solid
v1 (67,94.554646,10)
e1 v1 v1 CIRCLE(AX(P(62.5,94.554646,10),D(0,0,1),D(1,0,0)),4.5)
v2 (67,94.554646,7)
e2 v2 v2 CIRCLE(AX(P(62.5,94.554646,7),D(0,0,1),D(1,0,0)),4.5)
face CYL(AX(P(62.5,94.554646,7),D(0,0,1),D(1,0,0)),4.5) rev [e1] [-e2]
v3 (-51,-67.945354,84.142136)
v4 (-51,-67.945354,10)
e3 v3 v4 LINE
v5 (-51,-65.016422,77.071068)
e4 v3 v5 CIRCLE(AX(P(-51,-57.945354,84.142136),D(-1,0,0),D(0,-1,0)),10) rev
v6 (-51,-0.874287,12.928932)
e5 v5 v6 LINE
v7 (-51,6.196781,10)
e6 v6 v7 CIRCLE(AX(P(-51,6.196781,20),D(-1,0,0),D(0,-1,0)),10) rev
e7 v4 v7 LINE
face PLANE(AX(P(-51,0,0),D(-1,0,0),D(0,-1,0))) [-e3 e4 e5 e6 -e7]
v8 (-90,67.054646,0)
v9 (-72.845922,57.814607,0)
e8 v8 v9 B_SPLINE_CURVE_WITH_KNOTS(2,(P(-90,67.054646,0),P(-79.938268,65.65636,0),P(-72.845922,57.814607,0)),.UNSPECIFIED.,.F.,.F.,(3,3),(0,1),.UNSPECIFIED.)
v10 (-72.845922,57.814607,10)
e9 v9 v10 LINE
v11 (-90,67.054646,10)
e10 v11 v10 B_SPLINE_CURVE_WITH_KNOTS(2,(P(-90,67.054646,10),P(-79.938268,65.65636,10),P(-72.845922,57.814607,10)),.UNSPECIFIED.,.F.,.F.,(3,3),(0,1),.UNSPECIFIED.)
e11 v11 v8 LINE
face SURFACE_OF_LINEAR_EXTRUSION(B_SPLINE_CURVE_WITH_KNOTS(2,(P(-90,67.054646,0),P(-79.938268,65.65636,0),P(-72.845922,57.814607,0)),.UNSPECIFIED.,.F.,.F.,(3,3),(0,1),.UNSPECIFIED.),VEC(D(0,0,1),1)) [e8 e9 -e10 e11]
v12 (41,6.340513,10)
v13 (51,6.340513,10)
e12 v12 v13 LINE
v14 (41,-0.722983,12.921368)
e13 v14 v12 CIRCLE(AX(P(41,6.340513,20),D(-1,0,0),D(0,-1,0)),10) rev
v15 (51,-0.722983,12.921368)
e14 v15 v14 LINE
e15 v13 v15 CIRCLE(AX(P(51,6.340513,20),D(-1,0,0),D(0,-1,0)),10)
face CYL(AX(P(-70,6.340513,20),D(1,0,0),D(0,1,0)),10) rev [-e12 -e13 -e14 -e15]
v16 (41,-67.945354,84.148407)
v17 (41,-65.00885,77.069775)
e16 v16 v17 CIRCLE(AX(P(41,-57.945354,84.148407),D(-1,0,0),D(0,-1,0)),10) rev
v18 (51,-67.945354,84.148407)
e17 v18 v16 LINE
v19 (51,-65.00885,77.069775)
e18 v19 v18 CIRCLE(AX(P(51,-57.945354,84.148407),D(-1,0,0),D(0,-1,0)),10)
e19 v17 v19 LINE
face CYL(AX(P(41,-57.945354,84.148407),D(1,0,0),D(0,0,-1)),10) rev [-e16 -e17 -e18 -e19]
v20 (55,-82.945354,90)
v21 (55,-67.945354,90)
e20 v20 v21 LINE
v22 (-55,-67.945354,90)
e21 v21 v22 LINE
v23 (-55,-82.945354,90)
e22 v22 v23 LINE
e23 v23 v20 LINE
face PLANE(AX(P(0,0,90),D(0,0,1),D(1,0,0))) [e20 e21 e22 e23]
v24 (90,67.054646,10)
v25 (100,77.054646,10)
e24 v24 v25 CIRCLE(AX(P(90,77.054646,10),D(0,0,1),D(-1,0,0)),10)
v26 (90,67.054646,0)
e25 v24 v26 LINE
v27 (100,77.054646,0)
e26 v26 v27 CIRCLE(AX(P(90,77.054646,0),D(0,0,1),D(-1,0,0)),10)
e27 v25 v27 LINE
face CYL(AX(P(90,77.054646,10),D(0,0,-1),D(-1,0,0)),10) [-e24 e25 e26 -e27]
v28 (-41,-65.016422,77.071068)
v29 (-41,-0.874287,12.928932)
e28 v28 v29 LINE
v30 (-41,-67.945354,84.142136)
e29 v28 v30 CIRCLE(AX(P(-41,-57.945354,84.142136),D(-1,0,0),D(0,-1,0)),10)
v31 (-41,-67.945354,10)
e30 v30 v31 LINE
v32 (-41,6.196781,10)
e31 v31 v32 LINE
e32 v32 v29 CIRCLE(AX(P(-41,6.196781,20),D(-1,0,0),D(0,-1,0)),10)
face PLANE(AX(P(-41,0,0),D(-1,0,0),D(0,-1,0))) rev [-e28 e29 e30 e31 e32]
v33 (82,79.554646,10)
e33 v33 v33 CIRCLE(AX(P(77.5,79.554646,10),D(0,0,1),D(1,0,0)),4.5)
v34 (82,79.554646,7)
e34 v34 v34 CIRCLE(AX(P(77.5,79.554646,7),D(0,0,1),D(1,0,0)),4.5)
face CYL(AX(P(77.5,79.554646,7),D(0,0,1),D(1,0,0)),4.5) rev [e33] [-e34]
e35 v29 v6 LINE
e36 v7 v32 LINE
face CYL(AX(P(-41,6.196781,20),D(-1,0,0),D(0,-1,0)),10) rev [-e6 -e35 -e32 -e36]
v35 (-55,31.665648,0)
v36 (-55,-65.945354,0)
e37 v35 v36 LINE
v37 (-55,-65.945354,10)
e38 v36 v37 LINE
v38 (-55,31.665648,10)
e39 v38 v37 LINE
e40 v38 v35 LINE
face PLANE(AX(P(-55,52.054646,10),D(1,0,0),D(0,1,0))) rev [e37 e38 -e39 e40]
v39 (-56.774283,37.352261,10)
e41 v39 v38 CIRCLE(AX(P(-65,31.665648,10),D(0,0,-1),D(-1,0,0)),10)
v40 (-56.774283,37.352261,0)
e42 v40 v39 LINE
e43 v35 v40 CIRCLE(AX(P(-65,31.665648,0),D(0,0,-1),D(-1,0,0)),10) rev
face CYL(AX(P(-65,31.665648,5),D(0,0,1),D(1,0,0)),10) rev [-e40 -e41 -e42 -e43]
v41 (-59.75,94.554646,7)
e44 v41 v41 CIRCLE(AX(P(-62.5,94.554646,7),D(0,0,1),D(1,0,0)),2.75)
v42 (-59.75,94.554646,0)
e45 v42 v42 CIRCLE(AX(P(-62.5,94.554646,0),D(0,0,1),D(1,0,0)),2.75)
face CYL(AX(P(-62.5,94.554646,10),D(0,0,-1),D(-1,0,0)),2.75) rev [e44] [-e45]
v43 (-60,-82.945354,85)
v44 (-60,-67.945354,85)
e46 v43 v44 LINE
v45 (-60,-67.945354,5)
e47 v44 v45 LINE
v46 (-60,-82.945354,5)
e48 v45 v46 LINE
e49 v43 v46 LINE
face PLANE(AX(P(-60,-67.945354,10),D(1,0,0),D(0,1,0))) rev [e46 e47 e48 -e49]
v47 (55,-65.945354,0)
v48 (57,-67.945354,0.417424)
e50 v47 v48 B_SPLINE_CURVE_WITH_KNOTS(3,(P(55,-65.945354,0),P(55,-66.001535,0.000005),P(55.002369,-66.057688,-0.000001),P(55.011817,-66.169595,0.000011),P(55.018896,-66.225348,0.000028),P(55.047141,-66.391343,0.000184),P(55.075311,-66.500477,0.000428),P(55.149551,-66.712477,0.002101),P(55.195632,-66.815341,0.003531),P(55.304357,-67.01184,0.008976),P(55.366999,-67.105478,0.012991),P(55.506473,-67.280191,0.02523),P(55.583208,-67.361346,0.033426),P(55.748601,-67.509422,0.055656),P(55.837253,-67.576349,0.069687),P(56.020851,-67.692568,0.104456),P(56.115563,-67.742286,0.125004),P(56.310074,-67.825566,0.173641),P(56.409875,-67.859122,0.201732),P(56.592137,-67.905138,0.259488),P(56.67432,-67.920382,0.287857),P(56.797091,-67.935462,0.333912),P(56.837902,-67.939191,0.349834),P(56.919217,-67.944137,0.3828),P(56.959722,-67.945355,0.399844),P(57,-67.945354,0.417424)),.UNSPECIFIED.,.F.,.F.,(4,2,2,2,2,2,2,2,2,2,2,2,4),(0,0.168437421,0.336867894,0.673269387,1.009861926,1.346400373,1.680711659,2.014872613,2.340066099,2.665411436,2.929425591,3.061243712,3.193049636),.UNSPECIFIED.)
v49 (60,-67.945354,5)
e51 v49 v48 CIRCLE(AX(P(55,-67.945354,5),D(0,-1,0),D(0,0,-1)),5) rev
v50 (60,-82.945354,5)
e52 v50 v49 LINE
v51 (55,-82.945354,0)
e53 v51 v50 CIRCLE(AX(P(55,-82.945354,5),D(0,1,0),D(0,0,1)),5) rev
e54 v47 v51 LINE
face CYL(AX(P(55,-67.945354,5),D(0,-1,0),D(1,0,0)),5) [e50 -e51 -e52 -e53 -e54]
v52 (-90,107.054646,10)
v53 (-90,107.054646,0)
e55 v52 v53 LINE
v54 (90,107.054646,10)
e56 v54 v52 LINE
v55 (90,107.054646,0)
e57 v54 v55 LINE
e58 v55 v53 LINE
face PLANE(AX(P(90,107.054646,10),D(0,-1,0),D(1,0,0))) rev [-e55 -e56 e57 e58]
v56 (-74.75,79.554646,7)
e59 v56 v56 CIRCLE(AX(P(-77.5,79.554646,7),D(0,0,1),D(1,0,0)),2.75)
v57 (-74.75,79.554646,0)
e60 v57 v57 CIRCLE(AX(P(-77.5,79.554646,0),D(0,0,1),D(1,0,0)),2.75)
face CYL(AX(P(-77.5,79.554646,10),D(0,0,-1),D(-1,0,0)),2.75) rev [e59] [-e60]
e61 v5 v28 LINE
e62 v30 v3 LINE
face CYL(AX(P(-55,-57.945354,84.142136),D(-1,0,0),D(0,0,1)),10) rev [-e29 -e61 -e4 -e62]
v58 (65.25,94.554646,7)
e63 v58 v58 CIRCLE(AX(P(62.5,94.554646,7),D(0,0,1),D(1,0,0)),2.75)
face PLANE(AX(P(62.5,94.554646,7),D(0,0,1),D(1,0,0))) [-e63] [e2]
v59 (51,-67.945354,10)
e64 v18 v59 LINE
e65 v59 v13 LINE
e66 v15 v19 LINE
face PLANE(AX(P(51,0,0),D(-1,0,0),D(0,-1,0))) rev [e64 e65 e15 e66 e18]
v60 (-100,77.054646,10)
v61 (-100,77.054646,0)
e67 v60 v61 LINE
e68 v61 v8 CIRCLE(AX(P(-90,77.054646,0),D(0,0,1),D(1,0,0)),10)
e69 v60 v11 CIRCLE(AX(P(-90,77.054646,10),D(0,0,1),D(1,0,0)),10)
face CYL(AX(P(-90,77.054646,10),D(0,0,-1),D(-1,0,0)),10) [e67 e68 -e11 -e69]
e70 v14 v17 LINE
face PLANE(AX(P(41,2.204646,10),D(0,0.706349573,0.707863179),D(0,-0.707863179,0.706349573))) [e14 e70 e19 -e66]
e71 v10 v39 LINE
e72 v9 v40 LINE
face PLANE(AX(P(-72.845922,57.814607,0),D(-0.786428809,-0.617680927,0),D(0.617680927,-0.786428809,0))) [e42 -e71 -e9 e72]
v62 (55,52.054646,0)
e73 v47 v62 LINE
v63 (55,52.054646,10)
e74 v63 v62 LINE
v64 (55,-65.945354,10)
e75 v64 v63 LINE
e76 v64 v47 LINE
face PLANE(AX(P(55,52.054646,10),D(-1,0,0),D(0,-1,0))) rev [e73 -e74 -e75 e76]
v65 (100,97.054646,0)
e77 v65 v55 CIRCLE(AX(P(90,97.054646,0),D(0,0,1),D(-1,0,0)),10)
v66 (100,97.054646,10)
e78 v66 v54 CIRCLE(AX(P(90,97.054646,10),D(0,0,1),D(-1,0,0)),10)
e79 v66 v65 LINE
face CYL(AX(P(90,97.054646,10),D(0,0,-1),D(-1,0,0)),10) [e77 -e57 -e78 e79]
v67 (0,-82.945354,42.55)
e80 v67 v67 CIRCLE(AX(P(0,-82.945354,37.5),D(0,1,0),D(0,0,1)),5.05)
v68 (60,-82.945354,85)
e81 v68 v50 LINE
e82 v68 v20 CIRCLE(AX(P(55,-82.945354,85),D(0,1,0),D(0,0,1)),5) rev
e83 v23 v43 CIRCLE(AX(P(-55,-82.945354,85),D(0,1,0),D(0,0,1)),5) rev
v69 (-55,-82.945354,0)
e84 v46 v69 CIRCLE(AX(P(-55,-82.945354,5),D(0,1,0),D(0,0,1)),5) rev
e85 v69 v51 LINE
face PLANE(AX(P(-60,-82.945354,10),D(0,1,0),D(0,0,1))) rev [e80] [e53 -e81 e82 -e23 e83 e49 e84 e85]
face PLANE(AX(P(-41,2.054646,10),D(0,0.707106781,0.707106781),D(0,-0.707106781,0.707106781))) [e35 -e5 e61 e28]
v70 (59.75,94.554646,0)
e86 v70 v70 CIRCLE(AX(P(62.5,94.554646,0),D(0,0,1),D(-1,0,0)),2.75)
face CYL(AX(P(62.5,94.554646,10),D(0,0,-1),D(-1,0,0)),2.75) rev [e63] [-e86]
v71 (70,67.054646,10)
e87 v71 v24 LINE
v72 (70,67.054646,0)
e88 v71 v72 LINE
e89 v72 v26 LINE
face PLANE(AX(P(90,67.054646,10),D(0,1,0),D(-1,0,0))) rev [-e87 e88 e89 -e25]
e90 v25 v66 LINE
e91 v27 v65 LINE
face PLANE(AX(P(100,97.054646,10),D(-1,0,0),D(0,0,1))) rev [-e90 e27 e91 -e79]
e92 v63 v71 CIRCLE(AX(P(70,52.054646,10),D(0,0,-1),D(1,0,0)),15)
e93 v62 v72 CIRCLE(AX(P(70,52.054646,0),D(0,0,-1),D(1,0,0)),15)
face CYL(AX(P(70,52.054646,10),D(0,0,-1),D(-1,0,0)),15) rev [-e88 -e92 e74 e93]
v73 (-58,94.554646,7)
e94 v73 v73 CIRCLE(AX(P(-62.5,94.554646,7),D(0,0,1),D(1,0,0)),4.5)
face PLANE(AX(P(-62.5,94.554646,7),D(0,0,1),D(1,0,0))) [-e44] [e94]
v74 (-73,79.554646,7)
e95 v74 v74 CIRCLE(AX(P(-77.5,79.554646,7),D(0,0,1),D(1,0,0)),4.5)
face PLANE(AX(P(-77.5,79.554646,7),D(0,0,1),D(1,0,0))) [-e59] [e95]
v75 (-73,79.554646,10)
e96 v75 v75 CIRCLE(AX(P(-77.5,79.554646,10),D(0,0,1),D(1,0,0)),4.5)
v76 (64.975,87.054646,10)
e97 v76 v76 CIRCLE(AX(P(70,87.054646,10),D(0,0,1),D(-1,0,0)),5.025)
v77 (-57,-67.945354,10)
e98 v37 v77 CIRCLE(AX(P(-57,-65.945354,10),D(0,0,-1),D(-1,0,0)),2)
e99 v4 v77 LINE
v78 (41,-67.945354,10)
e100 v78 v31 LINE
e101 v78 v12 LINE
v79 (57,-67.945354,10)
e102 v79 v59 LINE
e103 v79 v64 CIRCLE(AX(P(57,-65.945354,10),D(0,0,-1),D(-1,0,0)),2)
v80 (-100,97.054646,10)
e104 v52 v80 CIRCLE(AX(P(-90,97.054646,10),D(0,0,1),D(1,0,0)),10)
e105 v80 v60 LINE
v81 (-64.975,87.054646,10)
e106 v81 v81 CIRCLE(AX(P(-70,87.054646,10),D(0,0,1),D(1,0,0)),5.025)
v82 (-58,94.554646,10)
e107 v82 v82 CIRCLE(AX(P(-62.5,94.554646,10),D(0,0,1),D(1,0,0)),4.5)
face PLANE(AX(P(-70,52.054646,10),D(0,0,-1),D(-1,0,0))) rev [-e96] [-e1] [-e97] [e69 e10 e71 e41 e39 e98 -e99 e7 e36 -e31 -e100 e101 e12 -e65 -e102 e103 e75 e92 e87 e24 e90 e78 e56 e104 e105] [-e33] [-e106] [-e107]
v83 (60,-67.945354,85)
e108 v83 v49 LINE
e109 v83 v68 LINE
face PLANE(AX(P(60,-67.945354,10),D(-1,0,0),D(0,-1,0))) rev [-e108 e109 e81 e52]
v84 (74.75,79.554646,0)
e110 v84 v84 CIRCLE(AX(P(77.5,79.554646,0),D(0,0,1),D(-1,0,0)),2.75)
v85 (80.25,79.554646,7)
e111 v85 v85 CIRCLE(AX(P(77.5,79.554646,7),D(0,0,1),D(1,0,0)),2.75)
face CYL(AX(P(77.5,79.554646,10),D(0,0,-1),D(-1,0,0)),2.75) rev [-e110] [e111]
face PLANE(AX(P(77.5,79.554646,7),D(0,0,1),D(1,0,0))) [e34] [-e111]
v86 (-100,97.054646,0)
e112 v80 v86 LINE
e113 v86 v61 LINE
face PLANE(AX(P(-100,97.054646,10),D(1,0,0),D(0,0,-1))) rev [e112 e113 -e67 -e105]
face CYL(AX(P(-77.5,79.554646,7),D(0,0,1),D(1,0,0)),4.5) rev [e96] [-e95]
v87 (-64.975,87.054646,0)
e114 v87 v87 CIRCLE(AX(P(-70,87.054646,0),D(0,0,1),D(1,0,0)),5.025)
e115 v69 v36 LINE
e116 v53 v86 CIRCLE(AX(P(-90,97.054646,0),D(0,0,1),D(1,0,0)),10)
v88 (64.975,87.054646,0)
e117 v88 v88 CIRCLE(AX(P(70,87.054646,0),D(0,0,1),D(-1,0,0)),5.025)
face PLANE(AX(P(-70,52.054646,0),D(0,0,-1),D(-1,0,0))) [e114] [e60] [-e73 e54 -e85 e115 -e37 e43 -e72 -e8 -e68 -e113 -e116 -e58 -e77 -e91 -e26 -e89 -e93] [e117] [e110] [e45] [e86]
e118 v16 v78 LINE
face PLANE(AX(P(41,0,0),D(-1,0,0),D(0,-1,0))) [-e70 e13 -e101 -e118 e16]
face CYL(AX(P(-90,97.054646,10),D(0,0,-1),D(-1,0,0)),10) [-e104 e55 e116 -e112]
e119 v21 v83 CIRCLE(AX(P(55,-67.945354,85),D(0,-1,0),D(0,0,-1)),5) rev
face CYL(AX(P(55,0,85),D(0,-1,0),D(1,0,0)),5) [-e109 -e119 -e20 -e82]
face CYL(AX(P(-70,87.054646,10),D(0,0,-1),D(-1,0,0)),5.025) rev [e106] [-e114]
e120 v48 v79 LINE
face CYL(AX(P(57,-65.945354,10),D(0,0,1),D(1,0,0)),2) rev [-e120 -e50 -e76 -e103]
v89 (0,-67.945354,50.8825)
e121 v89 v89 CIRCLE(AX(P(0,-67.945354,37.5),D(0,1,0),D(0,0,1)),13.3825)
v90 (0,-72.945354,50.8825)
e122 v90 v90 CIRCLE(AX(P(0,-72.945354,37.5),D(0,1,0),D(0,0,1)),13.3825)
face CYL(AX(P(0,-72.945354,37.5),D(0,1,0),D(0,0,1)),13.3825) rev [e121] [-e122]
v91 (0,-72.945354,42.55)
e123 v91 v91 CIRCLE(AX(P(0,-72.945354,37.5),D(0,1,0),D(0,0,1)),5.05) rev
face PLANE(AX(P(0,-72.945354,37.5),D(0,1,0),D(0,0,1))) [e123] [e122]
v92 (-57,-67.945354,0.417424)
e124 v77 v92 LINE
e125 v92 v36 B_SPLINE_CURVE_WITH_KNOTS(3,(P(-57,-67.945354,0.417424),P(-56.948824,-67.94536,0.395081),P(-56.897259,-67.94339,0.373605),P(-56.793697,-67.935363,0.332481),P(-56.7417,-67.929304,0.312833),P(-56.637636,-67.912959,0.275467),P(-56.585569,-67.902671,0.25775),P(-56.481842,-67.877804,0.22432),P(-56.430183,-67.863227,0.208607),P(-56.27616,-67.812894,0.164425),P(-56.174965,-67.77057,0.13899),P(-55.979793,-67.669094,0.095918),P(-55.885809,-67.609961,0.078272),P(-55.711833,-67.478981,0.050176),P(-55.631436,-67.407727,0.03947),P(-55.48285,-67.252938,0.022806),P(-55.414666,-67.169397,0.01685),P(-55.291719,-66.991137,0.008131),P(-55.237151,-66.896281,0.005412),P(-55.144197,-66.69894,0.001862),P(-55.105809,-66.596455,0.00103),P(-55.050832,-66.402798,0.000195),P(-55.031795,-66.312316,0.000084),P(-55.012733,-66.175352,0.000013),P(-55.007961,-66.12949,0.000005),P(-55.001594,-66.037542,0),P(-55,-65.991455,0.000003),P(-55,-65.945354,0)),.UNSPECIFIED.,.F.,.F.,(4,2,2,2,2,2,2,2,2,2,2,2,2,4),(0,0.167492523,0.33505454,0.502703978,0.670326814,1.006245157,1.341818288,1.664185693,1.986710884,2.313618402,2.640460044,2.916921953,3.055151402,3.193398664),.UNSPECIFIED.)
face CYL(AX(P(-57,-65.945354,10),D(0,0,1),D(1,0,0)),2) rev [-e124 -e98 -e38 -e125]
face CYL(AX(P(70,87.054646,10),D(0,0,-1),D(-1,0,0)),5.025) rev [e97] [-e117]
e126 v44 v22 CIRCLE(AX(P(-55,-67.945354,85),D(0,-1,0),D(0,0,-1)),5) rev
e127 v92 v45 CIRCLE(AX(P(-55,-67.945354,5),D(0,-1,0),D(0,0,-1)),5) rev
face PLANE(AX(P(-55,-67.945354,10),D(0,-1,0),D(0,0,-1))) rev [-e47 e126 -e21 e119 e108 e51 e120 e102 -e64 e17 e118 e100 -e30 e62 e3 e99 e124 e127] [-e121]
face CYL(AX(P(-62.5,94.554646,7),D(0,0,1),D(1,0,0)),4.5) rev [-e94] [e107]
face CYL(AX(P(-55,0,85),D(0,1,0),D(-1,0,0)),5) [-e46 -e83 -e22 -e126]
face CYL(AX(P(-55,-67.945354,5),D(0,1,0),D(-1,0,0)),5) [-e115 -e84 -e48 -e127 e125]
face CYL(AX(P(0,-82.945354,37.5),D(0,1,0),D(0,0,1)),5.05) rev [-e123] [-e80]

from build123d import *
from OCP.BRepAlgoAPI import BRepAlgoAPI_Cut
from OCP.TopTools import TopTools_ListOfShape

# Parameters (mm, degrees)
SKIZZE1_R                       = 5.025
SKIZZE1_R_2                     = 2.75
AUFSATZ_LINEAR_AUSTRAGEN1_DEPTH = 10
AUFSATZ_LINEAR_AUSTRAGEN3_DEPTH = 10
SKIZZE4_W                       = 120
SKIZZE4_H                       = 15
AUFSATZ_LINEAR_AUSTRAGEN4_DEPTH = 80
AUFSATZ_LINEAR_AUSTRAGEN5_DEPTH = 10
AUFSATZ_LINEAR_AUSTRAGEN6_DEPTH = 10
VERRUNDUNG3_R                   = 10
VERRUNDUNG4_R                   = 5
VERRUNDUNG5_R                   = 10
SKIZZE11_R                      = 4.5
SCHNITT_LINEAR_AUSTRAGEN1_DEPTH = 3
VERRUNDUNG6_START               = 5.0000001
VERRUNDUNG6_DEPTH               = 4.9999999
VERRUNDUNG6_START_2             = -1e-07
VERRUNDUNG6_2_DEPTH             = 5.0000002
VERRUNDUNG6_START_3             = -67.945354479
VERRUNDUNG6_3_DEPTH             = 2.945354479
SKIZZE13_R                      = 5.05
SCHNITT_LINEAR_AUSTRAGEN3_DEPTH = 221.737400671
SKIZZE14_R                      = 13.3825
SCHNITT_LINEAR_AUSTRAGEN4_DEPTH = 5


with BuildPart() as part:
    # Skizze1 → Aufsatz-Linear austragen1 (new body)
    with BuildSketch(Plane.XY):
        with BuildLine():
            Line((90, 107.054645521), (-90, 107.054645521))
            ThreePointArc((-90, 107.054645521), (-97.071067812, 104.125713333), (-100, 97.054645521))
            Line((-100, 97.054645521), (-100, 77.054645521))
            ThreePointArc((-100, 77.054645521), (-97.071067812, 69.983577709), (-90, 67.054645521))
            Line((-90, 67.054645521), (-70, 67.054645521))
            ThreePointArc((-70, 67.054645521), (-59.393398282, 62.661247239), (-55, 52.054645521))
            Line((-55, 52.054645521), (-55, -67.945354479))
            Line((-55, -67.945354479), (-60, -67.945354479))
            Line((-60, -67.945354479), (-60, -82.945354479))
            Line((-60, -82.945354479), (60, -82.945354479))
            Line((60, -82.945354479), (60, -67.945354479))
            Line((60, -67.945354479), (55, -67.945354479))
            Line((55, -67.945354479), (55, 52.054645521))
            ThreePointArc((55, 52.054645521), (59.393398282, 62.661247239), (70, 67.054645521))
            Line((70, 67.054645521), (90, 67.054645521))
            ThreePointArc((90, 67.054645521), (97.071067812, 69.983577709), (100, 77.054645521))
            Line((100, 77.054645521), (100, 97.054645521))
            ThreePointArc((100, 97.054645521), (97.071067812, 104.125713333), (90, 107.054645521))
        make_face()
        with Locations((-70, 87.054645521)):
            Circle(SKIZZE1_R, mode=Mode.SUBTRACT)
        with Locations((-62.5, 94.554645521)):
            Circle(SKIZZE1_R_2, mode=Mode.SUBTRACT)
        with Locations((-77.5, 79.554645521)):
            Circle(SKIZZE1_R_2, mode=Mode.SUBTRACT)
        with Locations(Location((77.5, 79.554645521, 0), (0, 0, 180))):
            Circle(SKIZZE1_R_2, mode=Mode.SUBTRACT)
        with Locations(Location((62.5, 94.554645521, 0), (0, 0, 180))):
            Circle(SKIZZE1_R_2, mode=Mode.SUBTRACT)
        with Locations(Location((70, 87.054645521, 0), (0, 0, 180))):
            Circle(SKIZZE1_R, mode=Mode.SUBTRACT)
    extrude(amount=AUFSATZ_LINEAR_AUSTRAGEN1_DEPTH)

    # Skizze3 → Aufsatz-Linear austragen3 (add)
    with BuildSketch(Plane.XY.offset(10)):
        with BuildLine():
            Line((-72.845922337, 57.814606503), (-56.774282723, 37.352261221))
            add(Edge.make_bspline(
                [(-55, 18.961003518), (-46.636539725, 27.963101216), (-56.774282723, 37.352261221)],
                knots=[0, 0, 0, 1, 1, 1], degree=2))
            Line((-55, 18.961003518), (-43.333440031, 21.200490786))
            Line((-43.333440031, 21.200490786), (-45.498025685, 67.054645521))
            Line((-45.498025685, 67.054645521), (-90, 67.054645521))
            add(Edge.make_bspline(
                [(-90, 67.054645521), (-79.938268155, 65.656359823), (-72.845922337, 57.814606503)],
                knots=[0, 0, 0, 1, 1, 1], degree=2))
        make_face()
    extrude(amount=-AUFSATZ_LINEAR_AUSTRAGEN3_DEPTH)

    # Skizze4 → Aufsatz-Linear austragen4 (add)
    with BuildSketch(Plane.XY.offset(10)):
        with Locations((0, -75.445354479)):
            Rectangle(SKIZZE4_W, SKIZZE4_H)
    extrude(amount=AUFSATZ_LINEAR_AUSTRAGEN4_DEPTH)

    # Skizze9 → Aufsatz-Linear austragen5 (add)
    with BuildSketch(Plane.ZY.offset(51)):
        Polygon((10, 2.054645521), (80, -67.945354479), (6.644184354, -67.945354479), (6.644184354, 2.054645521), align=None)
    extrude(amount=-AUFSATZ_LINEAR_AUSTRAGEN5_DEPTH)

    # Skizze10 → Aufsatz-Linear austragen6 (add)
    with BuildSketch(Plane(origin=(51, 0, 0), x_dir=(0, 0, -1), z_dir=(1, 0, 0))):
        Polygon((-10, 2.204645521), (-80, -67.945354479), (-10, -67.945354479), align=None)
    extrude(amount=-AUFSATZ_LINEAR_AUSTRAGEN6_DEPTH)

    # Verrundung3
    verrundung3_edges = [part.edges().sort_by_distance(p)[0] for p in [
        (-46, -67.945354479, 80),
        (-46, 2.054645521, 10),
        (46, 2.204645521, 10),
        (46, -67.945354479, 80),
    ]]
    fillet(verrundung3_edges, radius=VERRUNDUNG3_R)

    # Verrundung4
    verrundung4_edges = [part.edges().sort_by_distance(p)[0] for p in [
        (-60, -75.445354479, 90),
        (60, -75.445354479, 90),
        (60, -75.445354479, 0),
        (-60, -75.445354479, 0),
    ]]
    fillet(verrundung4_edges, radius=VERRUNDUNG4_R)

    # Verrundung5
    # the kernel refuses this fillet: 10 mm, written as the material it adds along each edge
    with BuildSketch(Plane(origin=(-55, 35.554962551, 0), x_dir=(0, -1, 0), z_dir=(0, 0, 1))) as verrundung5_piece_1:
        with BuildLine():
            CenterArc((3.889315022, -10), VERRUNDUNG5_R, 90, 34.65693161)
            Line((-1.79729867, -1.774282723), (-1.911030943, -1.609768377))
            ThreePointArc((-1.911030943, -1.609768377), (-1.060157902, -0.723908397), (-0.133322184, 0.14908117))
            Line((-0.133322184, 0.14908117), (0, 0.2))
            Line((0, 0.2), (3.889315022, 0.2))
            Line((3.889315022, 0.2), (3.889315022, 0))
        make_face()
    extrude(amount=10)

    # Skizze11 → Schnitt-Linear austragen1 (cut)
    with BuildSketch(Plane.XY.offset(10)):
        with Locations((62.5, 94.554645521)):
            Circle(SKIZZE11_R)
        with Locations((77.5, 79.554645521)):
            Circle(SKIZZE11_R)
        with Locations((-62.5, 94.554645521)):
            Circle(SKIZZE11_R)
        with Locations((-77.5, 79.554645521)):
            Circle(SKIZZE11_R)
    extrude(amount=-SCHNITT_LINEAR_AUSTRAGEN1_DEPTH, mode=Mode.SUBTRACT)


with BuildPart() as verrundung6_tool:
    # Verrundung6: read off the stored shape, not the designer's step
    # Verrundung6 outline → Verrundung6 (new body)
    with BuildSketch(Plane.XY.offset(VERRUNDUNG6_START)):
        with BuildLine():
            Line((-57, -67.945354479), (-55, -67.945354479))
            Line((-55, -67.945354479), (-55, -65.945354479))
            ThreePointArc((-55, -65.945354479), (-55.585786438, -67.359568041), (-57, -67.945354479))
        make_face()
        with BuildLine():
            ThreePointArc((57, -67.945354479), (55.585786438, -67.359568041), (55, -65.945354479))
            Line((55, -65.945354479), (55, -67.945354479))
            Line((55, -67.945354479), (57, -67.945354479))
        make_face()
    extrude(amount=VERRUNDUNG6_DEPTH)


with BuildPart() as part_1:
    add(part.part)


with BuildPart() as part_2:
    # Verrundung6: joined with verrundung6_tool
    add(part_1.part.fuse(verrundung6_tool.part, tol=0.00001))


with BuildPart() as verrundung6_2_tool:
    # Verrundung6 2 outline → Verrundung6 2 (new body)
    with BuildSketch(Plane.XY.offset(VERRUNDUNG6_START_2)):
        with BuildLine():
            Line((-57, -67.945354479), (-55, -67.945354479))
            Line((-55, -67.945354479), (-55, -65.945354479))
            ThreePointArc((-55, -65.945354479), (-55.585786438, -67.359568041), (-57, -67.945354479))
        make_face()
        with BuildLine():
            ThreePointArc((57, -67.945354479), (55.585786438, -67.359568041), (55, -65.945354479))
            Line((55, -65.945354479), (55, -67.945354479))
            Line((55, -67.945354479), (57, -67.945354479))
        make_face()
    extrude(amount=VERRUNDUNG6_2_DEPTH)


with BuildPart() as part_3:
    add(part_2.part)


with BuildPart() as part_4:
    # Verrundung6 2: joined with verrundung6_2_tool
    add(part_3.part.fuse(verrundung6_2_tool.part, tol=0.00001))


with BuildPart() as verrundung6_3_tool:
    # Verrundung6 3 outline → Verrundung6 3 (new body)
    with BuildSketch(Plane(origin=(0, 0, 0), x_dir=(1, 0, 0), z_dir=(0, 1, 0)).offset(VERRUNDUNG6_START_3)):
        with BuildLine():
            Line((59, -3.288e-06), (55, 0))
            ThreePointArc((55, 0), (57.236067978, -0.527864045), (59, -2))
            Line((59, -2), (59, -3.288e-06))
        make_face()
        with BuildLine():
            ThreePointArc((-59, -2), (-57.236067913, -0.527864013), (-54.999999856, 0))
            Line((-54.999999856, 0), (-59, -5e-09))
            Line((-59, -5e-09), (-59, -2))
        make_face()
    extrude(amount=VERRUNDUNG6_3_DEPTH)


with BuildPart() as part_5:
    add(part_4.part)

    # Verrundung6 3: cut by verrundung6_3_tool, with a tolerance
    verrundung6_3_stock = TopTools_ListOfShape()
    verrundung6_3_stock.Append(part_5.part.wrapped)
    verrundung6_3_tools = TopTools_ListOfShape()
    verrundung6_3_tools.Append(verrundung6_3_tool.part.wrapped)
    verrundung6_3_cut = BRepAlgoAPI_Cut()
    verrundung6_3_cut.SetArguments(verrundung6_3_stock)
    verrundung6_3_cut.SetTools(verrundung6_3_tools)
    verrundung6_3_cut.SetFuzzyValue(0.00001)
    verrundung6_3_cut.Build()
    add(Compound.cast(verrundung6_3_cut.Shape()).solids(), mode=Mode.REPLACE)

    # Skizze13 → Schnitt-Linear austragen3 (cut, through all)
    with BuildSketch(Plane(origin=(0, -67.945354479, 0), x_dir=(1, 0, 0), z_dir=(0, 1, 0))):
        with Locations(Location((0, -37.5, 0), (0, 0, 270))):
            Circle(SKIZZE13_R)
    extrude(amount=-SCHNITT_LINEAR_AUSTRAGEN3_DEPTH, mode=Mode.SUBTRACT)

    # Skizze14 → Schnitt-Linear austragen4 (cut)
    with BuildSketch(Plane(origin=(0, -67.945354479, 0), x_dir=(1, 0, 0), z_dir=(0, 1, 0))):
        with Locations(Location((0, -37.5, 0), (0, 0, 270))):
            Circle(SKIZZE14_R)
    extrude(amount=-SCHNITT_LINEAR_AUSTRAGEN4_DEPTH, mode=Mode.SUBTRACT)


solid = part_5.part
